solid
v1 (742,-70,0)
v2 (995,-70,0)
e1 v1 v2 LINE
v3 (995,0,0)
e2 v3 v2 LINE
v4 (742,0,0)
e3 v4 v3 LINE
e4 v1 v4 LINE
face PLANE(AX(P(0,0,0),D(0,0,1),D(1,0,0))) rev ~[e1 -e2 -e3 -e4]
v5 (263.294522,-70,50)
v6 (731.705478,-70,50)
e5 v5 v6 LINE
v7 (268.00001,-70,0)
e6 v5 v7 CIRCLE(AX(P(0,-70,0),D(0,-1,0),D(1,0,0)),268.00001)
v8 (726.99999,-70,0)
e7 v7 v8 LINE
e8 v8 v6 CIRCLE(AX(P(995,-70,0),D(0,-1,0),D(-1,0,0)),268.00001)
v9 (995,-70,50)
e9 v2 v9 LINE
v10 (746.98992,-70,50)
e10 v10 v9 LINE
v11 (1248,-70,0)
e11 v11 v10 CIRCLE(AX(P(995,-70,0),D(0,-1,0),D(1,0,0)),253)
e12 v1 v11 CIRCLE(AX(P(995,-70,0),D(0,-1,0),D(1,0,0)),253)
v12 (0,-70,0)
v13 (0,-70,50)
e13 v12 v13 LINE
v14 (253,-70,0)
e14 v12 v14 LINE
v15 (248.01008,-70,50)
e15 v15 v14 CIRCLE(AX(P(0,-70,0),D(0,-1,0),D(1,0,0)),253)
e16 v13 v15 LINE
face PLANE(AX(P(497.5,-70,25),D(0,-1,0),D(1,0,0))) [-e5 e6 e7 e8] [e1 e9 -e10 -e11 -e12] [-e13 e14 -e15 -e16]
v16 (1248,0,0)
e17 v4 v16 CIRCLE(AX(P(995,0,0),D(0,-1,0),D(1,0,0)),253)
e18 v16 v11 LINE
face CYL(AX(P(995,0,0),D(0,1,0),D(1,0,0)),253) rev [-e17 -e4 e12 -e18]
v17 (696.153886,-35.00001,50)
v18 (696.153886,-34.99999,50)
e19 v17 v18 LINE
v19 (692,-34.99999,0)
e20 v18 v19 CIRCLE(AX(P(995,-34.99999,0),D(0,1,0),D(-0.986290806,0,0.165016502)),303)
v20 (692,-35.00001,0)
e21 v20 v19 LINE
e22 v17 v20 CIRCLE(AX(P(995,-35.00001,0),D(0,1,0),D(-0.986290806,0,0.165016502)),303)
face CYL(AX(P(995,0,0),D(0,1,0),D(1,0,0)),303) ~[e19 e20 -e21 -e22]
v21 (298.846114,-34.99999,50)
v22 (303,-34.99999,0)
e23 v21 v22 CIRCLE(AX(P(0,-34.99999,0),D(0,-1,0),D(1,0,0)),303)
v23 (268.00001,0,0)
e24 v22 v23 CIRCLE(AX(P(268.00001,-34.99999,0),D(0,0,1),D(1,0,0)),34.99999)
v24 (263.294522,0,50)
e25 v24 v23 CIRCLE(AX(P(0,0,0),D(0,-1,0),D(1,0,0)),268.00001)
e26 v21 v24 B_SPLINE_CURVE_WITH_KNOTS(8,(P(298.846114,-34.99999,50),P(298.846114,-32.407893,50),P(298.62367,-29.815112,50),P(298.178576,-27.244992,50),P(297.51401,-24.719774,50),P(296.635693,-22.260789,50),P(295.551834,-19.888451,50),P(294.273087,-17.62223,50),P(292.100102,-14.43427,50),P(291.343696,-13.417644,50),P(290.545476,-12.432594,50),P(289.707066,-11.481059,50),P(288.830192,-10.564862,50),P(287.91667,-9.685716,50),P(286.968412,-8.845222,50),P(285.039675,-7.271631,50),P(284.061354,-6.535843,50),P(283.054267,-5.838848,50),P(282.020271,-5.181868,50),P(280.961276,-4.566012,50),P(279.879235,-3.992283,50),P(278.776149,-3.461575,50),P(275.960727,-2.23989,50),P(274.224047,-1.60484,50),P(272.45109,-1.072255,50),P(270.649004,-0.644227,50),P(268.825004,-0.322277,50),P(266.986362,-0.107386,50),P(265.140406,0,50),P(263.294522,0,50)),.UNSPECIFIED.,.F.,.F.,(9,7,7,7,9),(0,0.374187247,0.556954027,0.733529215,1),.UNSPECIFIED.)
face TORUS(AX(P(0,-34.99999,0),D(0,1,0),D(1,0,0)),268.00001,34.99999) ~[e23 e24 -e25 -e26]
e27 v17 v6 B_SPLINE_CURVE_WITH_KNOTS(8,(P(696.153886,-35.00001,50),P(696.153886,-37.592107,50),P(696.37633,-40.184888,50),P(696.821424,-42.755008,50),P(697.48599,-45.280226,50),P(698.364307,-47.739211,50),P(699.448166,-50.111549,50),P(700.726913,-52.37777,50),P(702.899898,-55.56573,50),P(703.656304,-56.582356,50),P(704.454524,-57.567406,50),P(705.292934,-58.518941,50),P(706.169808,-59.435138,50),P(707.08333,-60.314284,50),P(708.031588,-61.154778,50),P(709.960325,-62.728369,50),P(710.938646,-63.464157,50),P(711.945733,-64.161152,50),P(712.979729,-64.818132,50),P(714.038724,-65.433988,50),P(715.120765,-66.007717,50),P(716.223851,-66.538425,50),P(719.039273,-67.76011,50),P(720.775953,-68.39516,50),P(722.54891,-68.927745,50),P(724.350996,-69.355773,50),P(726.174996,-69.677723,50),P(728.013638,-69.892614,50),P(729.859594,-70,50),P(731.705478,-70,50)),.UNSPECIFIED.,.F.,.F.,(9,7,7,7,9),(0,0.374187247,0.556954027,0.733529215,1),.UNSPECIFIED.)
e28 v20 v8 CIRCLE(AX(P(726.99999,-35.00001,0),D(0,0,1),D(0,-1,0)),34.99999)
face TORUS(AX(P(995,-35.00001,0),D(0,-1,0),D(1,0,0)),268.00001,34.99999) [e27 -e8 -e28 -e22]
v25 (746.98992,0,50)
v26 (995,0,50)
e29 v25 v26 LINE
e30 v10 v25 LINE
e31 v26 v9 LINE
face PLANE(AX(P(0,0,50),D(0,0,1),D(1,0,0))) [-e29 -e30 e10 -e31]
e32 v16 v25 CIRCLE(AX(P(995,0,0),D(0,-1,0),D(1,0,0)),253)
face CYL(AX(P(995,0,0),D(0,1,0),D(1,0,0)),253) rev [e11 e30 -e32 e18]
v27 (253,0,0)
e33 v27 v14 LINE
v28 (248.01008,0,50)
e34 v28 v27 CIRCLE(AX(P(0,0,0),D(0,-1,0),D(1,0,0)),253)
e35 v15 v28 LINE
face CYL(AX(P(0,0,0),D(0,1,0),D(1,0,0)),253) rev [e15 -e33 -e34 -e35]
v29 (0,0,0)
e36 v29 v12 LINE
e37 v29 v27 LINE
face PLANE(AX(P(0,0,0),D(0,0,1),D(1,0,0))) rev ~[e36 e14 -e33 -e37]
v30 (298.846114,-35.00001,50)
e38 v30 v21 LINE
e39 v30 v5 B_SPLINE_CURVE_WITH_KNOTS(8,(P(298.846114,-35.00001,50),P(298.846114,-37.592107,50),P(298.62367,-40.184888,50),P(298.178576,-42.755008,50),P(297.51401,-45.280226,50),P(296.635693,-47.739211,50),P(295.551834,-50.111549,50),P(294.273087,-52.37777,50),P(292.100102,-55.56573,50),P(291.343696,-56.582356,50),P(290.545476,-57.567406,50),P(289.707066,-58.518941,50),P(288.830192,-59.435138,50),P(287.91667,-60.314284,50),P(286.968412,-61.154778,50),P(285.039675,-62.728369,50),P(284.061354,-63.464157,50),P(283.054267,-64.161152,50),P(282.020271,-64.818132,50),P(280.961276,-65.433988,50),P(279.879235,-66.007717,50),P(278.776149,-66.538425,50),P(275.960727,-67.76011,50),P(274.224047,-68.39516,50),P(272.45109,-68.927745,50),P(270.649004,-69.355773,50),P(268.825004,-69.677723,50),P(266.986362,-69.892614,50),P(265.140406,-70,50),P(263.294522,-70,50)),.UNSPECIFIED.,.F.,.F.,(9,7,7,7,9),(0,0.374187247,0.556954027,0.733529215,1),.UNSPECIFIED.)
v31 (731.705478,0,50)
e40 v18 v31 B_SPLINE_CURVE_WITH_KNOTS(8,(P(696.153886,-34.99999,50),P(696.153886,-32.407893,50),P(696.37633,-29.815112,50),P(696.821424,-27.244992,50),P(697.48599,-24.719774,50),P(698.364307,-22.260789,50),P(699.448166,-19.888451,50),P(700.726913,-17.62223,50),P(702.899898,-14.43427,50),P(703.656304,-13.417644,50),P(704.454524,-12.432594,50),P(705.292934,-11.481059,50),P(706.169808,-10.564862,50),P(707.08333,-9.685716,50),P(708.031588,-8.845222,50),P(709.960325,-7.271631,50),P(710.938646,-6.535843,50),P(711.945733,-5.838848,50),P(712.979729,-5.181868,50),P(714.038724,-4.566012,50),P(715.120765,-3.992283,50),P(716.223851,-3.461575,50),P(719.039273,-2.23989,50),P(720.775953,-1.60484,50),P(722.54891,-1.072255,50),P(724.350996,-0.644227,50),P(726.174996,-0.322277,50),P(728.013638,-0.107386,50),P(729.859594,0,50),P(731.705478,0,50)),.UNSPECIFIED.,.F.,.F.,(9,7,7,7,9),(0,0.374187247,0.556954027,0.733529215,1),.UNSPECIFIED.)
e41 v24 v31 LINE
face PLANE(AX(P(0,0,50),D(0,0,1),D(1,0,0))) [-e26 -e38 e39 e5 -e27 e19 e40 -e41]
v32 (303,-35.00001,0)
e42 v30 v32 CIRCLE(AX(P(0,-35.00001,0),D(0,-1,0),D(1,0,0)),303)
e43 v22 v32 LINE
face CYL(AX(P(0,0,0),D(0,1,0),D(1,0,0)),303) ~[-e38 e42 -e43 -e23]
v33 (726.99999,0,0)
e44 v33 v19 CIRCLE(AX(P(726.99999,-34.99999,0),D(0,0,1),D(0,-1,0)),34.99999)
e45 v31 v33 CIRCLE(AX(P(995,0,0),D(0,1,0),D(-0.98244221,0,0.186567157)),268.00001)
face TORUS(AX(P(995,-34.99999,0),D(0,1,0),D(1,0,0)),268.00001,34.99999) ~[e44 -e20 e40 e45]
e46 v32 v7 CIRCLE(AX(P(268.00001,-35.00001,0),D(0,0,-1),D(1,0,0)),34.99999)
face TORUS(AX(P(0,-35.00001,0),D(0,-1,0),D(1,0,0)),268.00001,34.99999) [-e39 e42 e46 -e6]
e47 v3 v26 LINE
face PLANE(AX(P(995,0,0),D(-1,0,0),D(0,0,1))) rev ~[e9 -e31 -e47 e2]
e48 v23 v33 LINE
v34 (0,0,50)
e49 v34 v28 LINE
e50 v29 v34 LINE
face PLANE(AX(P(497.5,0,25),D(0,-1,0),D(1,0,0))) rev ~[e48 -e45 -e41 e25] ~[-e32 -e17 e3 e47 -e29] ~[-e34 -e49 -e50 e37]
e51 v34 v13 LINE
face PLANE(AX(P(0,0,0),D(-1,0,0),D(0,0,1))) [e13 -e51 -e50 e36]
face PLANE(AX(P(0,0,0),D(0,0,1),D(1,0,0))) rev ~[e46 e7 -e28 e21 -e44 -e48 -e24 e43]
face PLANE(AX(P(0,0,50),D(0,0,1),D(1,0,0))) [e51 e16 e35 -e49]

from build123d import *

# Parameters (mm, degrees)
F0_R     = 303
F0_R_2   = 253
F1_DEPTH = 70
F2_R     = 34.99999
F4_W     = 995
F4_H     = 50
F5_DEPTH = 70


# Not quite as in the source:
# - a fillet or chamfer is up to 0.001 mm smaller than in the source, because OpenCascade refuses the exact size


with BuildPart() as f1:
    # F0 (on Front) → F1 (new body)
    with BuildSketch(Plane.XZ):
        Circle(F0_R)
        Circle(F0_R_2, mode=Mode.SUBTRACT)
    extrude(amount=F1_DEPTH)

    # F2 (radius 35 in the source; OpenCascade refuses exactly that, so slightly less here)
    f2_edges = [f1.edges().sort_by_distance(p)[0] for p in [
        (-303, -70, 0),
        (-303, 0, 0),
    ]]
    fillet(f2_edges, radius=F2_R)


with BuildPart() as f3_1:
    # F3: copy of F1
    add(f1.part.moved(Location((995, 0, 0))))


with BuildPart() as f1_1:
    add(f1.part)

    add(f3_1.part)  # F5 merges F3_1
    # F4 (on Front) → F5 (join)
    with BuildSketch(Plane.XZ):
        with Locations((497.5, 25)):
            Rectangle(F4_W, F4_H)
    extrude(amount=F5_DEPTH)


solid = f1_1.part
